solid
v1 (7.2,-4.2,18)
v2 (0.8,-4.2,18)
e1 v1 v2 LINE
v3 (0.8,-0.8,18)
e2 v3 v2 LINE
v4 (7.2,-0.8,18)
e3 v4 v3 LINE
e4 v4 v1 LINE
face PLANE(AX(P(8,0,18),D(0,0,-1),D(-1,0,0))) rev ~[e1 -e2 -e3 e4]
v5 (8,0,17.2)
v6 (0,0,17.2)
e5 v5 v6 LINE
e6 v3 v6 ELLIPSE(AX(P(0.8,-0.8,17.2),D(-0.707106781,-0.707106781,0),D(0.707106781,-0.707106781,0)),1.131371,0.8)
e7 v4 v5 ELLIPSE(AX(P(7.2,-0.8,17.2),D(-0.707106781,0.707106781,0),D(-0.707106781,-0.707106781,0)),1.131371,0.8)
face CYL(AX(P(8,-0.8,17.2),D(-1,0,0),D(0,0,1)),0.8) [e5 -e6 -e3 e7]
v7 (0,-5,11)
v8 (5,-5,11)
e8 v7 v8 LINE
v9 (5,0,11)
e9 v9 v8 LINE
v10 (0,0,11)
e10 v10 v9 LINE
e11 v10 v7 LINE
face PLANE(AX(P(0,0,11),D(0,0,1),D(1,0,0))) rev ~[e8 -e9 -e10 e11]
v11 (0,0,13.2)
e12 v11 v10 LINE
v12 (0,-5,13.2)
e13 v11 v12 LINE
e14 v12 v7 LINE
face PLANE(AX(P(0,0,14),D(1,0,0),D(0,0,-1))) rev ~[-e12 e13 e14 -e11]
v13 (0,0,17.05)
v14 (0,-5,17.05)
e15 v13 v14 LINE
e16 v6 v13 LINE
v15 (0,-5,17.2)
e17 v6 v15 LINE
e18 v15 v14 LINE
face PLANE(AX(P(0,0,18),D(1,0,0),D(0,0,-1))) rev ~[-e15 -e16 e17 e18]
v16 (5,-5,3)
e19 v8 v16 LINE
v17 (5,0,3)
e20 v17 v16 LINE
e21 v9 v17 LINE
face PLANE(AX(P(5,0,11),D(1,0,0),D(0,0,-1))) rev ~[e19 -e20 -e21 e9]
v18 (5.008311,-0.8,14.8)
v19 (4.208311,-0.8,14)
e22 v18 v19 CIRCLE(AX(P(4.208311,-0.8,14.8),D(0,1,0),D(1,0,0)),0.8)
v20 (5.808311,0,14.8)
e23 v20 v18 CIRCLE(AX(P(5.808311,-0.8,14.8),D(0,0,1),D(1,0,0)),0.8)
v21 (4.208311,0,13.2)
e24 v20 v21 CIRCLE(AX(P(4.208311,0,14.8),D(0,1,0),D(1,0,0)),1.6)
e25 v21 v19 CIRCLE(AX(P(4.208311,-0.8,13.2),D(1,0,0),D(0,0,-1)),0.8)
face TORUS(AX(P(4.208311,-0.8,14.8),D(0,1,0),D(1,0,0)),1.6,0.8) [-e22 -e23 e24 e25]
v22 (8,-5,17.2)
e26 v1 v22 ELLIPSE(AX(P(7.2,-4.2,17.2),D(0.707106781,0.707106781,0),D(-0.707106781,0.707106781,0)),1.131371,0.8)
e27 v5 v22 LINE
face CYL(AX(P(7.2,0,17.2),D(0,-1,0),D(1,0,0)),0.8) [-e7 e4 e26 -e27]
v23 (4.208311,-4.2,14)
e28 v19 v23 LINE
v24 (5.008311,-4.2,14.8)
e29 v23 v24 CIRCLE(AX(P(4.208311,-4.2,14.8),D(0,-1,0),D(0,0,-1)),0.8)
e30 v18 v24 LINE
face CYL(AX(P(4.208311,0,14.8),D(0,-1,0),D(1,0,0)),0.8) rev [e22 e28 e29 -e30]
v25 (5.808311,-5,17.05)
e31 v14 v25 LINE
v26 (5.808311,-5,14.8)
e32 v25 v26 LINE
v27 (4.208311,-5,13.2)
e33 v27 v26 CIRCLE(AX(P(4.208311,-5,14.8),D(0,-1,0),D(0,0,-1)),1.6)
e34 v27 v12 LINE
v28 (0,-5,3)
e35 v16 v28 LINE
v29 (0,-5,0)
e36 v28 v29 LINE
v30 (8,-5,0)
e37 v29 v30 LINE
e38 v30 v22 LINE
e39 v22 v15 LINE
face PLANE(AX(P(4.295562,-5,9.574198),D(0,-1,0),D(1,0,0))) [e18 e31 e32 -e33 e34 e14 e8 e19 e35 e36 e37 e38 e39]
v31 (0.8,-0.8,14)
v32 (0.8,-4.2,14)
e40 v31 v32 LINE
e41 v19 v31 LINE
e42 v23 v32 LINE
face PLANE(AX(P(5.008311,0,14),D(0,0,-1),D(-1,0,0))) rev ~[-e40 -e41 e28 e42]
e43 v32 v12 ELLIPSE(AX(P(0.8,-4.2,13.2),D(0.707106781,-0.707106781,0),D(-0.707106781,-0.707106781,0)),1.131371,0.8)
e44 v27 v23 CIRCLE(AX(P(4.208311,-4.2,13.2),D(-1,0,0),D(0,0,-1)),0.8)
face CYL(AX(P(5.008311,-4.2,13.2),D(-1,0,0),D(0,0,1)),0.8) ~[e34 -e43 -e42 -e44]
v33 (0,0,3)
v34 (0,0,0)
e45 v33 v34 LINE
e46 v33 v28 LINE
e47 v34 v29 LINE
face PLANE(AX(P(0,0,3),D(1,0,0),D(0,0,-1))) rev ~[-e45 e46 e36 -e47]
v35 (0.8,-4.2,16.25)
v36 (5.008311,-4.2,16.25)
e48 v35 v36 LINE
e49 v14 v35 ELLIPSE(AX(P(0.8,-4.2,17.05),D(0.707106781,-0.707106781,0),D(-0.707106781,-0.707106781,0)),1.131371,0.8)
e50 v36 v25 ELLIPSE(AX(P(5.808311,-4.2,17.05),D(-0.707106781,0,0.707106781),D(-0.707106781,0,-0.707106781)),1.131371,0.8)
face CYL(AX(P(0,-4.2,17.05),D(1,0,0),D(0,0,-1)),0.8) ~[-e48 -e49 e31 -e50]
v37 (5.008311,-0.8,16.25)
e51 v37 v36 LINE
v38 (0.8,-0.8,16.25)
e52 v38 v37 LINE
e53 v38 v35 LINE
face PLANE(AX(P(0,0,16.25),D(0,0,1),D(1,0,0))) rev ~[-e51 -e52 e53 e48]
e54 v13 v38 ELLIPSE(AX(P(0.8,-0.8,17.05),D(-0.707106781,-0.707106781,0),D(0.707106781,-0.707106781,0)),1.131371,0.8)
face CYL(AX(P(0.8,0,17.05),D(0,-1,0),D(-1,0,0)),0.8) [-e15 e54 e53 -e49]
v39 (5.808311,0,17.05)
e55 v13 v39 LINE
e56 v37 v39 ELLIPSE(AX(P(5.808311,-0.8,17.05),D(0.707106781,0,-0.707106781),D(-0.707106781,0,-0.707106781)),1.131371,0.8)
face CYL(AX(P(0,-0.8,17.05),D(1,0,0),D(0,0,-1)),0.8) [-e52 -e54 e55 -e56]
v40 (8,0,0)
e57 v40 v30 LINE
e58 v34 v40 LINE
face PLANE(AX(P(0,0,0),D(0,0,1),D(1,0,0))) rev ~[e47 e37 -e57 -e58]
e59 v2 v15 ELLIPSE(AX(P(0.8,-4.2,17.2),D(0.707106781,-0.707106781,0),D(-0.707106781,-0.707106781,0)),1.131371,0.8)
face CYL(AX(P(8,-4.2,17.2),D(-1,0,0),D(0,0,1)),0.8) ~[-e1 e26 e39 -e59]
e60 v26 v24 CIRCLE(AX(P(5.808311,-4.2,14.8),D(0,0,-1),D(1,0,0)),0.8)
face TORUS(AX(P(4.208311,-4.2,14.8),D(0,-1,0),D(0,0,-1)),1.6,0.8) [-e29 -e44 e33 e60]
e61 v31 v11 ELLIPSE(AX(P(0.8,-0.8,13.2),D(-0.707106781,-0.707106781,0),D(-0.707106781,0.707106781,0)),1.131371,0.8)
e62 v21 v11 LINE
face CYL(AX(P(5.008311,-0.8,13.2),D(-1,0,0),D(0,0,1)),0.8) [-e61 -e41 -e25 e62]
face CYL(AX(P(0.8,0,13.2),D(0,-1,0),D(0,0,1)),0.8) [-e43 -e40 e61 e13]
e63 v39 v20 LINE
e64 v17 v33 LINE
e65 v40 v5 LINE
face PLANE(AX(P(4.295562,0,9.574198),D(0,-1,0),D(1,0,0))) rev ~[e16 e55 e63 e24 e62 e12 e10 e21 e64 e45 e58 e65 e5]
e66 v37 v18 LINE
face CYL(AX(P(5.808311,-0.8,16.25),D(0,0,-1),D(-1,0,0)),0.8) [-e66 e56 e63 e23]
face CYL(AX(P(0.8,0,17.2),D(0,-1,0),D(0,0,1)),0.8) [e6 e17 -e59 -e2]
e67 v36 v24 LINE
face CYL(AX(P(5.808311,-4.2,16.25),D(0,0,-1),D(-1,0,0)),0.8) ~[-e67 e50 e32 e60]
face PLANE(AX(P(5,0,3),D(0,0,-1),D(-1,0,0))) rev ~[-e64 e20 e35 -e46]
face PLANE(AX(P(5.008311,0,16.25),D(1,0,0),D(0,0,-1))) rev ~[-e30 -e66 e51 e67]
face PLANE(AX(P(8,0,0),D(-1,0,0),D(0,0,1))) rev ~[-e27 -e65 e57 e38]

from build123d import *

# Parameters (mm, degrees)
F1_DEPTH = 5
F2_R     = 0.8


with BuildPart() as f1:
    # F0 (on Front) → F1 (new body)
    with BuildSketch(Plane.XZ):
        Polygon((0, 3), (0, 0), (8, 0), (8, 18), (0, 18), (0, 16.25), (5.0083114872, 16.25), (5.0083114872, 14), (0, 14), (0, 11), (5, 11), (5, 3), align=None)
    extrude(amount=F1_DEPTH)

    # F2
    f2_edges = [f1.edges().sort_by_distance(p)[0] for p in [
        (0, -2.5, 18),
        (0, -2.5, 16.25),
        (2.504156, -5, 14),
        (5.008311, -5, 15.125),
        (5.008311, 0, 15.125),
        (2.504156, -5, 16.25),
        (2.504156, 0, 14),
        (2.504156, 0, 16.25),
        (4, 0, 18),
        (4, -5, 18),
        (8, -2.5, 18),
        (5.008311, -2.5, 14),
        (0, -2.5, 14),
    ]]
    fillet(f2_edges, radius=F2_R)


solid = f1.part
